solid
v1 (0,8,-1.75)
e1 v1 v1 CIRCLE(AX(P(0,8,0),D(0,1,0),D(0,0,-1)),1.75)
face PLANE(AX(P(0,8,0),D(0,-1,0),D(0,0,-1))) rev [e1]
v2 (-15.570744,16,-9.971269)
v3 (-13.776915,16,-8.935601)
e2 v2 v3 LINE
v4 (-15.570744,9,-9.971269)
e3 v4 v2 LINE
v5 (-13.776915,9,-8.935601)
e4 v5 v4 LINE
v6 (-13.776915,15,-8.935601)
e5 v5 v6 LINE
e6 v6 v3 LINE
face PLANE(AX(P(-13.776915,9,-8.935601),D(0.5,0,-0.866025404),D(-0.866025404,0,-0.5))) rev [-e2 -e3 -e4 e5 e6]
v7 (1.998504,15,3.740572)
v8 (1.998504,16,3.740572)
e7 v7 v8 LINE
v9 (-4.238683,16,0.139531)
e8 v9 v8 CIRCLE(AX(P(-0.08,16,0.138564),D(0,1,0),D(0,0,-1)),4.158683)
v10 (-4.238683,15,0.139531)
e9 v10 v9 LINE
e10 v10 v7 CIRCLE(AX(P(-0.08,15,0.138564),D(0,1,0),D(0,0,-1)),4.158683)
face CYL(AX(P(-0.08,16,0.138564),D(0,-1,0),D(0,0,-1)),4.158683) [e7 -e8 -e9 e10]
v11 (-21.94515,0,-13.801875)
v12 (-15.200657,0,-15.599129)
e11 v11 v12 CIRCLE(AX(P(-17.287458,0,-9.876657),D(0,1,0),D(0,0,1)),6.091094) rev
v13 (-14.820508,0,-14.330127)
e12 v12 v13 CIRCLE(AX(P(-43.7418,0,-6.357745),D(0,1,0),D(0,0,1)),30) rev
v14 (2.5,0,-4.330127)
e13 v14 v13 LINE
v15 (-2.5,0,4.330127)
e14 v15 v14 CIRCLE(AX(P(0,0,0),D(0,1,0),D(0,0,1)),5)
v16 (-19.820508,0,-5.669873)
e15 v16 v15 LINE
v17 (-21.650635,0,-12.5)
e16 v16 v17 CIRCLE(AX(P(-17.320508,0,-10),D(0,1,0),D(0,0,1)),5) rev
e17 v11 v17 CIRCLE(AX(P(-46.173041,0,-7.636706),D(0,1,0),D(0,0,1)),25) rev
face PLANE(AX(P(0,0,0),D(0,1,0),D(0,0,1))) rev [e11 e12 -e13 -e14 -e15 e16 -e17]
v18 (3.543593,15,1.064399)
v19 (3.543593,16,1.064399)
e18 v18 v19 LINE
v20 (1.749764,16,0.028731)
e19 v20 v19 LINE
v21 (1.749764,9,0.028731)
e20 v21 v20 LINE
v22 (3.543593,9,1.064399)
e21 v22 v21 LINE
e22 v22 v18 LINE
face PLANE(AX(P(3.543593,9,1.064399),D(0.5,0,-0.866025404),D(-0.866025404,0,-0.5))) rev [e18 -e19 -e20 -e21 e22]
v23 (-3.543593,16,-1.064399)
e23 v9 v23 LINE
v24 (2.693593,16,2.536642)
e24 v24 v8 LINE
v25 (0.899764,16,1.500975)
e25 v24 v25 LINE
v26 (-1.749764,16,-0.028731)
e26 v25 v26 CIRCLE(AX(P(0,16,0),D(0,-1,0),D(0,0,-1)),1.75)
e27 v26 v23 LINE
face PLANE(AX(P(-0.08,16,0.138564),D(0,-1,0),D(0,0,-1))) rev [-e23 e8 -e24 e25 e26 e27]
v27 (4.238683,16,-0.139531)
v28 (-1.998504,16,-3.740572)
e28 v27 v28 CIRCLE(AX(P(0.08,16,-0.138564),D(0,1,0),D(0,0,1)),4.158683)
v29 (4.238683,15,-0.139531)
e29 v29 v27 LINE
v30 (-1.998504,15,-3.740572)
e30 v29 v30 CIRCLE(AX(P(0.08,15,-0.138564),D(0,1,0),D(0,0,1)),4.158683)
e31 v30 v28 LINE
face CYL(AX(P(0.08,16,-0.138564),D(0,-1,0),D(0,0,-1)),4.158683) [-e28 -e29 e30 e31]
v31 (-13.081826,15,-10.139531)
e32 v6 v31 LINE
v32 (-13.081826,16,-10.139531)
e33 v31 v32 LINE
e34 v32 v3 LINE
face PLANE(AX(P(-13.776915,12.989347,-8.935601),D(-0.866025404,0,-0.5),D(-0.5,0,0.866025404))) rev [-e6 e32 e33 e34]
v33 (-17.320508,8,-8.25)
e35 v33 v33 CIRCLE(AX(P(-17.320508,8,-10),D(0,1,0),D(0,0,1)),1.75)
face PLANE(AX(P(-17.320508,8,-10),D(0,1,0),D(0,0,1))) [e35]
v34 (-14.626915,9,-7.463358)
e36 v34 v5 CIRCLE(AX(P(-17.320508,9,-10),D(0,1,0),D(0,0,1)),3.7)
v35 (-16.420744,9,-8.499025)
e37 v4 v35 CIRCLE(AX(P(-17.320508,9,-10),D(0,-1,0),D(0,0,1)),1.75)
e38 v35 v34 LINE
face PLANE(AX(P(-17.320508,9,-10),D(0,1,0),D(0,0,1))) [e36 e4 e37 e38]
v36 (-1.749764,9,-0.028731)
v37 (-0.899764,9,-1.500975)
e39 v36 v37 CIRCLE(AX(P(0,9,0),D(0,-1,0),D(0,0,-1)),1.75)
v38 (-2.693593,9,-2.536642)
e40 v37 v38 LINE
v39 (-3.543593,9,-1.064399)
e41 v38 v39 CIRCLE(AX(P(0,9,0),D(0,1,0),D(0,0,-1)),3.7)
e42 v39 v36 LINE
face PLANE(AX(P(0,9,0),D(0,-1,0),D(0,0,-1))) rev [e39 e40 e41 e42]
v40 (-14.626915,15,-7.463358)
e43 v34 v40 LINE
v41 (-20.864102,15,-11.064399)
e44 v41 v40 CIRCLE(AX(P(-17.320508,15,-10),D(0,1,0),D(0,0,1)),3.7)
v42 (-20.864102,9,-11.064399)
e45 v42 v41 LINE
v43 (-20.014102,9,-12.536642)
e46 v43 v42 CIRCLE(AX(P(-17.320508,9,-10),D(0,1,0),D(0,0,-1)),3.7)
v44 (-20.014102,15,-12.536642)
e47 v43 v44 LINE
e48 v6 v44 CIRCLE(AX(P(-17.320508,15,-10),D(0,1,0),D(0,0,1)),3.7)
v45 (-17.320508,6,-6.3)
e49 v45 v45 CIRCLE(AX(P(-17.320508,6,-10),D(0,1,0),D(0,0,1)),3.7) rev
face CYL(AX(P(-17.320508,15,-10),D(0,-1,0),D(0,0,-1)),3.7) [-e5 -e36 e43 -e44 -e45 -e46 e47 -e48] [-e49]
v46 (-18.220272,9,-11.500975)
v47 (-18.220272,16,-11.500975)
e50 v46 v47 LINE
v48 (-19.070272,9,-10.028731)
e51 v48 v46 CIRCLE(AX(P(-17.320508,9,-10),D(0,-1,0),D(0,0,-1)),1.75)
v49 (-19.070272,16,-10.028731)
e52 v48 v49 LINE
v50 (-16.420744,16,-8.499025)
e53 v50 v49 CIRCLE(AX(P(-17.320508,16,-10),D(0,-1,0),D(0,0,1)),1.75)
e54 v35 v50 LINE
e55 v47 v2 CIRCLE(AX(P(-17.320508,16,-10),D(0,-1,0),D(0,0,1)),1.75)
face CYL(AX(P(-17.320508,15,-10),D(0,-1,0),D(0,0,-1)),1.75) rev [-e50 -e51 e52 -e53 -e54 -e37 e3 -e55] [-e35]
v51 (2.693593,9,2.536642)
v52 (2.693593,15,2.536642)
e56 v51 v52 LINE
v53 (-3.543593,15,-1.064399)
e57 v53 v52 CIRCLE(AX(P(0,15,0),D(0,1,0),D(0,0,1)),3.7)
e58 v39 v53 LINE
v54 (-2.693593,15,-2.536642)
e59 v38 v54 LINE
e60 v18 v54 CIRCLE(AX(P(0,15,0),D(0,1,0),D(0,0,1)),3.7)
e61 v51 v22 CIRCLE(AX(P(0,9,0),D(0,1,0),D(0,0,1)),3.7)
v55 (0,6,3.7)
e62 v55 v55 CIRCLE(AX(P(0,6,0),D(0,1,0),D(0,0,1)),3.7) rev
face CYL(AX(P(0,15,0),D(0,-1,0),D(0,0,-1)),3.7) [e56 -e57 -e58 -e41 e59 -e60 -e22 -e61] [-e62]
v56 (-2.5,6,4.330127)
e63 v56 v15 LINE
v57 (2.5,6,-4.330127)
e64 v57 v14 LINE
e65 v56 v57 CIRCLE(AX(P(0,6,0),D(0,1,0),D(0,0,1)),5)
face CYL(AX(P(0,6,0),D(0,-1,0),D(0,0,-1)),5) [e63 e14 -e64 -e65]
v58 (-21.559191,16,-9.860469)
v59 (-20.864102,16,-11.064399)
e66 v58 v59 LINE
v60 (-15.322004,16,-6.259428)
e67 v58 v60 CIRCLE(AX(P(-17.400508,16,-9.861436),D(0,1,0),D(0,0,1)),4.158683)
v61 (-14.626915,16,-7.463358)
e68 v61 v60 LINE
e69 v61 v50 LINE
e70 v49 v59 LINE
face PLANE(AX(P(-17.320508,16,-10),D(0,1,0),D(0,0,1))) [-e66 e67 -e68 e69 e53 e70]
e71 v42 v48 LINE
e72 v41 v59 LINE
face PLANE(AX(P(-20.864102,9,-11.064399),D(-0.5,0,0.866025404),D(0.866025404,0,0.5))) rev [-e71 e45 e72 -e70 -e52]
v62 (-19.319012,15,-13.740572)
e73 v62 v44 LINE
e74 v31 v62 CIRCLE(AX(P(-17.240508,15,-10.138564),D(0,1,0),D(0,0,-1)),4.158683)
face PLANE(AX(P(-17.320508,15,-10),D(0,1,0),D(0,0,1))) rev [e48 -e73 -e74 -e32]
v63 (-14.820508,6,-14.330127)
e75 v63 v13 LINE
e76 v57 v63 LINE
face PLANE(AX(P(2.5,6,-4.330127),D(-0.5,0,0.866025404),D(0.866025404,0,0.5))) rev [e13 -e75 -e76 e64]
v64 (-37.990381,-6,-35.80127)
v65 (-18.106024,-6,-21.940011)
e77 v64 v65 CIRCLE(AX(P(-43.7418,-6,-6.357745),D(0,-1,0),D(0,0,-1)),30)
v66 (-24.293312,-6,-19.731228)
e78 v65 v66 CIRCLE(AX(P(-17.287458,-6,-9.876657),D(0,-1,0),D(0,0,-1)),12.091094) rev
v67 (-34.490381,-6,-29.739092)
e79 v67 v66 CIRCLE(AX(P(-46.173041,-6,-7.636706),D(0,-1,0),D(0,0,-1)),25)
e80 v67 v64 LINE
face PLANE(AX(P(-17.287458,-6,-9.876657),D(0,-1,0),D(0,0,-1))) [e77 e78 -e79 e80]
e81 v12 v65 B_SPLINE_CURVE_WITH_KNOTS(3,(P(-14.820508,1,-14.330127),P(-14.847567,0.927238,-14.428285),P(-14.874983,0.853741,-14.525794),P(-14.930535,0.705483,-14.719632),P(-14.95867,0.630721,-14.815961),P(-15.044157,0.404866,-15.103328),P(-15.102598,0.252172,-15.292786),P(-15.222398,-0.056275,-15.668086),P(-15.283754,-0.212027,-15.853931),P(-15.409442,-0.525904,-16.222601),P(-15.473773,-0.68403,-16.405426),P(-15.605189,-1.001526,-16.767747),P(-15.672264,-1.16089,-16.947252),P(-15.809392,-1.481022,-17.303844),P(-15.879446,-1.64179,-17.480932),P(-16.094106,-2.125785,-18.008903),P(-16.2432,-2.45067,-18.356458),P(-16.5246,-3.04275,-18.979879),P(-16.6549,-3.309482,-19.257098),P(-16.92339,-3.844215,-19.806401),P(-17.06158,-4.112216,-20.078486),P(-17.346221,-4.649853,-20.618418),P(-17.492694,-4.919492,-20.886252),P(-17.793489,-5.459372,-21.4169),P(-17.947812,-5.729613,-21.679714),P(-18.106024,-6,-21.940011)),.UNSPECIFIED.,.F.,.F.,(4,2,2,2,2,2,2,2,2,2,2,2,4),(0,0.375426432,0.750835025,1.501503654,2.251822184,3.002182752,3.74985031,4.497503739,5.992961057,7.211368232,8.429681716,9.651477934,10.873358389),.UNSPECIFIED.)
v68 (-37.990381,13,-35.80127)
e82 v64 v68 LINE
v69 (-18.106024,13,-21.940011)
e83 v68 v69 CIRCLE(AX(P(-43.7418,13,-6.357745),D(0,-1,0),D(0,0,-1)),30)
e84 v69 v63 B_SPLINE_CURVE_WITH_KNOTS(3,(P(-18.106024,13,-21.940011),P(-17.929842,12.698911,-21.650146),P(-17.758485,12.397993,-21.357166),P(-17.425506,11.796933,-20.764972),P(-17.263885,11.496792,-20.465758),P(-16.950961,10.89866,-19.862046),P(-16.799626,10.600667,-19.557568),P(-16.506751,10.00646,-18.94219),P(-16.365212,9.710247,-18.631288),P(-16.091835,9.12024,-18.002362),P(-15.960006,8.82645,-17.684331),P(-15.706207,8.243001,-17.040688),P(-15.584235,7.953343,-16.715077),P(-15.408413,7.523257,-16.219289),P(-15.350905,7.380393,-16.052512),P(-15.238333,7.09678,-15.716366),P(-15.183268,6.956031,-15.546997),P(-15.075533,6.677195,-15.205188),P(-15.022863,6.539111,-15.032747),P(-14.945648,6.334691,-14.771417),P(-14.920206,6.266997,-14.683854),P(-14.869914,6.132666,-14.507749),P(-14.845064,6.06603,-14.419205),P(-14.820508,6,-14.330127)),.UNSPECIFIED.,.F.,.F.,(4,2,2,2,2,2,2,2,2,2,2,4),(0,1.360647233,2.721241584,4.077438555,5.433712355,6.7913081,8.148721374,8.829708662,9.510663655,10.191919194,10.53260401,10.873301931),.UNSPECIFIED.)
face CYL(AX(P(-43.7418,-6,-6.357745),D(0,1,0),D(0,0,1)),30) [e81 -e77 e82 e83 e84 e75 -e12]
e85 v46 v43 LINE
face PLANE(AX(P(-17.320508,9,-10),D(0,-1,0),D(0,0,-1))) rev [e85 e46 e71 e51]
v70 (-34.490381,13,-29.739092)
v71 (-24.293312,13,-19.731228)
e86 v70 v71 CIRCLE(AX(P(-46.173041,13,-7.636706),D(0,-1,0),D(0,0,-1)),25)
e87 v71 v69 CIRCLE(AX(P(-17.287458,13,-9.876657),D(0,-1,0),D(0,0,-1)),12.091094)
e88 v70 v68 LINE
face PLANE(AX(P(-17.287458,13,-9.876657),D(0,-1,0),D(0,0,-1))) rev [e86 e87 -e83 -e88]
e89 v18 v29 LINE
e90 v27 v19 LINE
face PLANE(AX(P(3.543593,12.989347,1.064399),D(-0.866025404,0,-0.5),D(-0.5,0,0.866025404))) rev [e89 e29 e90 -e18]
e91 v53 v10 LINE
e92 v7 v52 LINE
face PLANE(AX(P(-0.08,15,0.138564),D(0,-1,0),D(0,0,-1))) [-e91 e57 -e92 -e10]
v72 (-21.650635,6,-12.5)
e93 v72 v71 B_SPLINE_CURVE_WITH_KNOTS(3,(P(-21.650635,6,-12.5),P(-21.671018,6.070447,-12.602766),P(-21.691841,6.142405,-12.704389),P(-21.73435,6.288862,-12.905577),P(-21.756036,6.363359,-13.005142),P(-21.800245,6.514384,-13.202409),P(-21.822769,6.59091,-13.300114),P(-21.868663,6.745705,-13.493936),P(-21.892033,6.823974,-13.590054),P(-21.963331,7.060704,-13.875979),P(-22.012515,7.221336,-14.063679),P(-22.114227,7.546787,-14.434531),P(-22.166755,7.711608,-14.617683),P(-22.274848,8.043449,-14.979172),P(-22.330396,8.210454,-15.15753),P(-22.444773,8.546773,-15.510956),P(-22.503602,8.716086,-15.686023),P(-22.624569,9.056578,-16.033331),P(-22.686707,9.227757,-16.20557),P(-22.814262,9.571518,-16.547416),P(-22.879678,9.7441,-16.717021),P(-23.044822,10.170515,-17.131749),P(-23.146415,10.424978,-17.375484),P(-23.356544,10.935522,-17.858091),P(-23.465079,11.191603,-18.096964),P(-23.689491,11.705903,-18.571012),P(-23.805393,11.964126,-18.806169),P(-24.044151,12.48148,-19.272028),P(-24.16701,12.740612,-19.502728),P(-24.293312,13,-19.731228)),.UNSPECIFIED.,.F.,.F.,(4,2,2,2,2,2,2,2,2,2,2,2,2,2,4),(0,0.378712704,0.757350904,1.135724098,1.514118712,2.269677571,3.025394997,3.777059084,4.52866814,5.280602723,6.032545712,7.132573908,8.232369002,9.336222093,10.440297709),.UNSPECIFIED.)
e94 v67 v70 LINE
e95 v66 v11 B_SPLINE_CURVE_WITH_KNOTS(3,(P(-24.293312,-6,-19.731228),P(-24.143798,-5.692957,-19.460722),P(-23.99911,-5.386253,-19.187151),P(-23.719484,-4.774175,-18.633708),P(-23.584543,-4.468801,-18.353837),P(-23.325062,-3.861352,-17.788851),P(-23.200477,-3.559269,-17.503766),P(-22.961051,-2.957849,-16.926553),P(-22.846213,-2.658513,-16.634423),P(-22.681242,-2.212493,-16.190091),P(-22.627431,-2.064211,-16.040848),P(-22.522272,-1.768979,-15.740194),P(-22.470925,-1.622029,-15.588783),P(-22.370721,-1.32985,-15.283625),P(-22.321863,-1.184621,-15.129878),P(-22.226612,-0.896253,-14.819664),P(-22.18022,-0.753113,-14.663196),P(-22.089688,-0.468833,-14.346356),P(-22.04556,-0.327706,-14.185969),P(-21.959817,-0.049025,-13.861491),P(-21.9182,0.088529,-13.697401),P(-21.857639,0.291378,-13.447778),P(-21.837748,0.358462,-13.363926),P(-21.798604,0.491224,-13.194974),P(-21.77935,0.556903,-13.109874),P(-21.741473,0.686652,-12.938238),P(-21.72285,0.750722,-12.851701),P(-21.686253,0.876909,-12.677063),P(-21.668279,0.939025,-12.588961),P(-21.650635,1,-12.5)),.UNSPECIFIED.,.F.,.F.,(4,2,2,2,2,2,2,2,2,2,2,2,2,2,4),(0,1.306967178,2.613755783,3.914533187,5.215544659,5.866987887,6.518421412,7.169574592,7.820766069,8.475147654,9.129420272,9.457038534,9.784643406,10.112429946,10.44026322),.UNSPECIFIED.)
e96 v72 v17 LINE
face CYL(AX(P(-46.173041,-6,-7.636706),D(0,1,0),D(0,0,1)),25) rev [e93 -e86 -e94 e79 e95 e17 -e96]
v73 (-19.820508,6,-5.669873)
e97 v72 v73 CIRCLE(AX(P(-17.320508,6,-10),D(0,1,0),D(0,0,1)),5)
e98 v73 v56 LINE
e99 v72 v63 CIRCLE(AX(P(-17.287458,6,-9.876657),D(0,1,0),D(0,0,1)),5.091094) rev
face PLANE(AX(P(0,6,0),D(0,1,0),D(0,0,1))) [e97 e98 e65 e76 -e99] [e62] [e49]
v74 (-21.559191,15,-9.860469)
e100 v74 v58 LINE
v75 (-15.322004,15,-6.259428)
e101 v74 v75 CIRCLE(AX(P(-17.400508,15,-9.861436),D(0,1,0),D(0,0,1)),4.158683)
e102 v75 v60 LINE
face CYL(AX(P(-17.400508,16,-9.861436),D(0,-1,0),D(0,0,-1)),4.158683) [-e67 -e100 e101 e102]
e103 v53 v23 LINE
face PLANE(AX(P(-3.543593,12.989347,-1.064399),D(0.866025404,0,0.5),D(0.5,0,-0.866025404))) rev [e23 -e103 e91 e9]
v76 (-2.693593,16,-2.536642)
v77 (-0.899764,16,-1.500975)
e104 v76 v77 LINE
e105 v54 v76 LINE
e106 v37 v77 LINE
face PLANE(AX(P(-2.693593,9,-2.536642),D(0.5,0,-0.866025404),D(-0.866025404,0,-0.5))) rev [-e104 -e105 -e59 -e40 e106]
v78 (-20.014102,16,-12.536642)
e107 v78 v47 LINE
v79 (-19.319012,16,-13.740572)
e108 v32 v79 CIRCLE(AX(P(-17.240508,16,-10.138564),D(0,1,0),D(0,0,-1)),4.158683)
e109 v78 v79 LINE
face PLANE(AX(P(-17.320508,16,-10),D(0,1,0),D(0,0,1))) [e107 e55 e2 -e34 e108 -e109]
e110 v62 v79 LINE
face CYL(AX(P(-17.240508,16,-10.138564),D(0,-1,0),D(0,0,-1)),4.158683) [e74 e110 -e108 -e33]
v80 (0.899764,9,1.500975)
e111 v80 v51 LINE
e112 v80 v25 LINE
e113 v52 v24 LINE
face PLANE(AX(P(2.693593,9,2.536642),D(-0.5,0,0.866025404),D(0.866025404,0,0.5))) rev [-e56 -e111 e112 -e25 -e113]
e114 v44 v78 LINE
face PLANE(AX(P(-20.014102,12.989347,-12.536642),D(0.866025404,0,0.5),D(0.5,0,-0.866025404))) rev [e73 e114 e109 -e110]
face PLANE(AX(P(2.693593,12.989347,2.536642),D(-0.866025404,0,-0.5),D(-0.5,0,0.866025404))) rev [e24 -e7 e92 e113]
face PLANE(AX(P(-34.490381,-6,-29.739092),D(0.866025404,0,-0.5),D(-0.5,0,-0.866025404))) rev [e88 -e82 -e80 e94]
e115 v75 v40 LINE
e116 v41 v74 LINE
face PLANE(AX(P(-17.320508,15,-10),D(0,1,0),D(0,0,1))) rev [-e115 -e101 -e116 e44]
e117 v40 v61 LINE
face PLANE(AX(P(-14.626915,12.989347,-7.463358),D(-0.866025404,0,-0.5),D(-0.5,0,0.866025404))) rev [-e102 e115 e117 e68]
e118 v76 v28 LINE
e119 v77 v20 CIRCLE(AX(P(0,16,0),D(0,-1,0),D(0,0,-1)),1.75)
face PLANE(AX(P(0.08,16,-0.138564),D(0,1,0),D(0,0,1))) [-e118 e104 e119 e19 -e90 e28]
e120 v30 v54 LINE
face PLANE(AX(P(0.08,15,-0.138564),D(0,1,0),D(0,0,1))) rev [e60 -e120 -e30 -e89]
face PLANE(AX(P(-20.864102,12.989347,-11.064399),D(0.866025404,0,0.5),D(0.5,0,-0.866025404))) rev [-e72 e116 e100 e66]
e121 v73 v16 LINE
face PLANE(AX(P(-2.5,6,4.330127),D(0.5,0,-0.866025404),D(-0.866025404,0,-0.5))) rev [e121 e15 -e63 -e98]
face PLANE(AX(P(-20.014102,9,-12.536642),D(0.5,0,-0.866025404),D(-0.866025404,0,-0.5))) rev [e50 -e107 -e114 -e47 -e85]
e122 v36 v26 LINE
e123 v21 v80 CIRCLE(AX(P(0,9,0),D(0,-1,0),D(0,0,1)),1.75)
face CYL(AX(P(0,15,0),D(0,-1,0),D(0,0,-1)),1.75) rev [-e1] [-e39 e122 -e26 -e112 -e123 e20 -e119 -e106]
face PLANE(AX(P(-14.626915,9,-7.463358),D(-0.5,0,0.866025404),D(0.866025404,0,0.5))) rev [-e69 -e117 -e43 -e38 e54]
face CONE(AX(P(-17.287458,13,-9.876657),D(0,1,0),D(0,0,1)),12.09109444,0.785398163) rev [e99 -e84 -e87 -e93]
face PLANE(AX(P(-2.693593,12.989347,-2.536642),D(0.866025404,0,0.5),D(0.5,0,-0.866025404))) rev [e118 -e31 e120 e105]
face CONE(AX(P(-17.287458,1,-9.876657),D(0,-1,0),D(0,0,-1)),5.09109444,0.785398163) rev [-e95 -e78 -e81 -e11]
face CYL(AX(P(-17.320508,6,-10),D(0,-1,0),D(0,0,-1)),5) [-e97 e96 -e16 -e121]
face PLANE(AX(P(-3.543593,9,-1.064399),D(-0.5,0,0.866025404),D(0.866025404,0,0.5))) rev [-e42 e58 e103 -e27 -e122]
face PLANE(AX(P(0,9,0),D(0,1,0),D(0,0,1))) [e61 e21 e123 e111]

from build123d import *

# Parameters (mm, degrees)
BOSS_EXTRUDE4_DEPTH       = 6
SKETCH1_10_R              = 3.7
SKETCH1_10_R_2            = 1.75
BOSS_EXTRUDE6_DEPTH       = 15
CUT_EXTRUDE1_START        = -6
CUT_EXTRUDE1_DEPTH        = 6
SKETCH6_R                 = 1.75
BOSS_EXTRUDE7_DEPTH       = 2
BOSS_EXTRUDE8_DEPTH       = 1
BOSS_EXTRUDE10_DEPTH      = 13
BOSS_EXTRUDE10_DEPTH_BACK = 6
CHAMFER2_SIZE             = 7
CUT_EXTRUDE2_DEPTH        = 1


with BuildPart() as part:
    # Sketch1 → Boss-Extrude4 (new body)
    with BuildSketch(Plane(origin=(0, 0, 0), x_dir=(1, 0, 0), z_dir=(0, 1, 0))):
        with BuildLine():
            Line((2.5, 4.330127019), (-14.820508076, 14.330127019))
            ThreePointArc((-14.820508076, 14.330127019), (-18.6051305, 14.794276156), (-21.650635095, 12.5))
            ThreePointArc((-21.650635095, 12.5), (-22.150137207, 8.705904774), (-19.820508076, 5.669872981))
            Line((-19.820508076, 5.669872981), (-2.5, -4.330127019))
            ThreePointArc((-2.5, -4.330127019), (4.330127019, -2.5), (2.5, 4.330127019))
        make_face()
    extrude(amount=BOSS_EXTRUDE4_DEPTH)

    # Sketch1<10> → Boss-Extrude6 (add)
    # profile 1 of 2: a face of its own
    with BuildSketch(Plane(origin=(0, 0, 0), x_dir=(1, 0, 0), z_dir=(0, 1, 0))):
        with Locations(Location((0, 0, 0), (0, 0, 270))):
            Circle(SKETCH1_10_R)
        with Locations(Location((0, 0, 0), (0, 0, 270))):
            Circle(SKETCH1_10_R_2, mode=Mode.SUBTRACT)
    # profile 2 of 2: a face of its own
    with BuildSketch(Plane(origin=(0, 0, 0), x_dir=(1, 0, 0), z_dir=(0, 1, 0))):
        with Locations(Location((-17.320508076, 10, 0), (0, 0, 270))):
            Circle(SKETCH1_10_R)
        with Locations(Location((-17.320508076, 10, 0), (0, 0, 270))):
            Circle(SKETCH1_10_R_2, mode=Mode.SUBTRACT)
    extrude(amount=BOSS_EXTRUDE6_DEPTH)

    # Sketch5 → Cut-Extrude1 (cut)
    with BuildSketch(Plane(origin=(0, 15, 0), x_dir=(1, 0, 0), z_dir=(0, 1, 0)).offset(CUT_EXTRUDE1_START)):
        with BuildLine():
            Line((-20.014101509, 12.536642351), (-18.220272206, 11.50097452))
            ThreePointArc((-18.220272206, 11.50097452), (-18.836052532, 10.875), (-19.070272206, 10.028731334))
            Line((-19.070272206, 10.028731334), (-20.864101509, 11.064399165))
            ThreePointArc((-20.864101509, 11.064399165), (-20.52480207, 11.85), (-20.014101509, 12.536642351))
        make_face()
        with BuildLine():
            Line((-13.776914643, 8.935600835), (-15.570743946, 9.971268666))
            ThreePointArc((-15.570743946, 9.971268666), (-15.804963619, 9.125), (-16.420743946, 8.49902548))
            Line((-16.420743946, 8.49902548), (-14.626914643, 7.463357649))
            ThreePointArc((-14.626914643, 7.463357649), (-14.116214082, 8.15), (-13.776914643, 8.935600835))
        make_face()
        with BuildLine():
            Line((2.693593433, -2.536642351), (0.89976413, -1.50097452))
            ThreePointArc((0.89976413, -1.50097452), (1.515544457, -0.875), (1.74976413, -0.028731334))
            Line((1.74976413, -0.028731334), (3.543593433, -1.064399165))
            ThreePointArc((3.543593433, -1.064399165), (3.204293994, -1.85), (2.693593433, -2.536642351))
        make_face()
        with BuildLine():
            Line((-3.543593433, 1.064399165), (-1.74976413, 0.028731334))
            ThreePointArc((-1.74976413, 0.028731334), (-1.515544457, 0.875), (-0.89976413, 1.50097452))
            Line((-0.89976413, 1.50097452), (-2.693593433, 2.536642351))
            ThreePointArc((-2.693593433, 2.536642351), (-3.204293994, 1.85), (-3.543593433, 1.064399165))
        make_face()
    extrude(amount=CUT_EXTRUDE1_DEPTH, mode=Mode.SUBTRACT)

    # Sketch6 → Boss-Extrude7 (add)
    with BuildSketch(Plane(origin=(0, 6, 0), x_dir=(1, 0, 0), z_dir=(0, 1, 0))):
        with Locations(Location((-17.320508076, 10, 0), (0, 0, 120.940718932))):
            Circle(SKETCH6_R)
        with Locations(Location((0, 0, 0), (0, 0, 90))):
            Circle(SKETCH6_R)
    extrude(amount=BOSS_EXTRUDE7_DEPTH)

    # Sketch8 → Boss-Extrude8 (add)
    with BuildSketch(Plane(origin=(0, 15, 0), x_dir=(1, 0, 0), z_dir=(0, 1, 0))):
        with BuildLine():
            Line((-18.220272206, 11.50097452), (-20.447114211, 12.786642351))
            ThreePointArc((-20.447114211, 12.786642351), (-15.161166743, 13.7400889), (-13.343901941, 8.685600835))
            Line((-13.343901941, 8.685600835), (-15.570743946, 9.971268666))
            ThreePointArc((-15.570743946, 9.971268666), (-16.445508076, 11.515544457), (-18.220272206, 11.50097452))
        make_face()
        with BuildLine():
            Line((-16.420743946, 8.49902548), (-14.193901941, 7.213357649))
            ThreePointArc((-14.193901941, 7.213357649), (-19.479849409, 6.2599111), (-21.297114211, 11.314399165))
            Line((-21.297114211, 11.314399165), (-19.070272206, 10.028731334))
            ThreePointArc((-19.070272206, 10.028731334), (-18.195508076, 8.484455543), (-16.420743946, 8.49902548))
        make_face()
        with BuildLine():
            Line((0.89976413, -1.50097452), (3.126606135, -2.786642351))
            ThreePointArc((3.126606135, -2.786642351), (-2.159341333, -3.7400889), (-3.976606135, 1.314399165))
            Line((-3.976606135, 1.314399165), (-1.74976413, 0.028731334))
            ThreePointArc((-1.74976413, 0.028731334), (-0.875, -1.515544457), (0.89976413, -1.50097452))
        make_face()
        with BuildLine():
            Line((-0.89976413, 1.50097452), (-3.126606135, 2.786642351))
            ThreePointArc((-3.126606135, 2.786642351), (2.159341333, 3.7400889), (3.976606135, -1.314399165))
            Line((3.976606135, -1.314399165), (1.74976413, -0.028731334))
            ThreePointArc((1.74976413, -0.028731334), (0.875, 1.515544457), (-0.89976413, 1.50097452))
        make_face()
    extrude(amount=BOSS_EXTRUDE8_DEPTH)

    # Sketch1<12> → Boss-Extrude10 (add, two sides: drawn at the far end of the back side and taken through both)
    with BuildSketch(Plane(origin=(0, 0, 0), x_dir=(1, 0, 0), z_dir=(0, 1, 0)).offset(-BOSS_EXTRUDE10_DEPTH_BACK)):
        with BuildLine():
            Line((-34.490381057, 29.739092363), (-37.990381057, 35.801270189))
            ThreePointArc((-37.990381057, 35.801270189), (-23.350583329, 28.362250924), (-14.820508076, 14.330127019))
            ThreePointArc((-14.820508076, 14.330127019), (-18.6051305, 14.794276156), (-21.650635095, 12.5))
            ThreePointArc((-21.650635095, 12.5), (-26.123146339, 22.569949107), (-34.490381057, 29.739092363))
        make_face()
    extrude(amount=BOSS_EXTRUDE10_DEPTH + BOSS_EXTRUDE10_DEPTH_BACK)

    # Chamfer2
    # the kernel refuses this chamfer: 7 mm, written as the material it takes off along each edge
    with BuildSketch(Plane(origin=(-17.287458299, -6, -9.876656552), x_dir=(0.2618523083710211, 0, 0.9651079569668709), z_dir=(-0.9651079569668709, 0, 0.2618523083710211))) as chamfer2_piece_1_section:
        Polygon((5.09109444 + CHAMFER2_SIZE, 0), (5.09109444, CHAMFER2_SIZE), (5.09109444, 0), align=None)
    chamfer2_piece_1 = revolve(axis=Axis((-17.287458299, -6, -9.876656552), (0, 1, 0)), revolution_arc=359.64, mode=Mode.PRIVATE)
    chamfer2_piece_1 = split(chamfer2_piece_1, bisect_by=Plane(origin=(-19.646446417, 0, -18.680520064), z_dir=(0, -1, 0)), keep=Keep.TOP, mode=Mode.PRIVATE)
    add(chamfer2_piece_1, mode=Mode.SUBTRACT)
    with BuildSketch(Plane(origin=(-17.287458299, 13, -9.876656552), x_dir=(0.2618523083710211, 0, 0.9651079569668709), z_dir=(-0.9651079569668709, 0, 0.2618523083710211))) as chamfer2_piece_2_section:
        Polygon((5.09109444 + CHAMFER2_SIZE, 0), (5.09109444, -CHAMFER2_SIZE), (5.09109444, 0), align=None)
    chamfer2_piece_2 = revolve(axis=Axis((-17.287458299, 13, -9.876656552), (0, 1, 0)), revolution_arc=359.64, mode=Mode.PRIVATE)
    chamfer2_piece_2 = split(chamfer2_piece_2, bisect_by=Plane(origin=(-19.516900024, 6, -18.197046345), z_dir=(0, 1, 0)), keep=Keep.TOP, mode=Mode.PRIVATE)
    add(chamfer2_piece_2, mode=Mode.SUBTRACT)

    # Sketch9 → Cut-Extrude2 (cut)
    with BuildSketch(Plane(origin=(0, 16, 0), x_dir=(1, 0, 0), z_dir=(0, 1, 0))):
        Polygon((-20.864101509, 11.064399165), (-21.559190629, 9.860469492), (-22.101511133, 10.173578381), (-21.406422012, 11.377508053), align=None)
        Polygon((-20.014101509, 12.536642351), (-19.319012388, 13.740572024), (-19.910294762, 14.081949062), (-20.605383883, 12.878019389), align=None)
        Polygon((-12.490543148, 9.79815347), (-13.081825522, 10.139530508), (-13.776914643, 8.935600835), (-13.185632268, 8.594223797), align=None)
        Polygon((-14.084594139, 7.15024876), (-14.626914643, 7.463357649), (-15.322003763, 6.259427976), (-14.77968326, 5.946319087), align=None)
        Polygon((-3.543593433, 1.064399165), (-4.238682554, -0.139530508), (-4.781003057, 0.173578381), (-4.085913936, 1.377508053), align=None)
        Polygon((-2.693593433, 2.536642351), (-1.998504312, 3.740572024), (-2.589786687, 4.081949062), (-3.284875807, 2.878019389), align=None)
        Polygon((4.829964928, -0.20184653), (4.238682554, 0.139530508), (3.543593433, -1.064399165), (4.134875807, -1.405776203), align=None)
        Polygon((3.235913936, -2.84975124), (2.693593433, -2.536642351), (1.998504312, -3.740572024), (2.540824816, -4.053680913), align=None)
    extrude(amount=-CUT_EXTRUDE2_DEPTH, mode=Mode.SUBTRACT)


solid = part.part
